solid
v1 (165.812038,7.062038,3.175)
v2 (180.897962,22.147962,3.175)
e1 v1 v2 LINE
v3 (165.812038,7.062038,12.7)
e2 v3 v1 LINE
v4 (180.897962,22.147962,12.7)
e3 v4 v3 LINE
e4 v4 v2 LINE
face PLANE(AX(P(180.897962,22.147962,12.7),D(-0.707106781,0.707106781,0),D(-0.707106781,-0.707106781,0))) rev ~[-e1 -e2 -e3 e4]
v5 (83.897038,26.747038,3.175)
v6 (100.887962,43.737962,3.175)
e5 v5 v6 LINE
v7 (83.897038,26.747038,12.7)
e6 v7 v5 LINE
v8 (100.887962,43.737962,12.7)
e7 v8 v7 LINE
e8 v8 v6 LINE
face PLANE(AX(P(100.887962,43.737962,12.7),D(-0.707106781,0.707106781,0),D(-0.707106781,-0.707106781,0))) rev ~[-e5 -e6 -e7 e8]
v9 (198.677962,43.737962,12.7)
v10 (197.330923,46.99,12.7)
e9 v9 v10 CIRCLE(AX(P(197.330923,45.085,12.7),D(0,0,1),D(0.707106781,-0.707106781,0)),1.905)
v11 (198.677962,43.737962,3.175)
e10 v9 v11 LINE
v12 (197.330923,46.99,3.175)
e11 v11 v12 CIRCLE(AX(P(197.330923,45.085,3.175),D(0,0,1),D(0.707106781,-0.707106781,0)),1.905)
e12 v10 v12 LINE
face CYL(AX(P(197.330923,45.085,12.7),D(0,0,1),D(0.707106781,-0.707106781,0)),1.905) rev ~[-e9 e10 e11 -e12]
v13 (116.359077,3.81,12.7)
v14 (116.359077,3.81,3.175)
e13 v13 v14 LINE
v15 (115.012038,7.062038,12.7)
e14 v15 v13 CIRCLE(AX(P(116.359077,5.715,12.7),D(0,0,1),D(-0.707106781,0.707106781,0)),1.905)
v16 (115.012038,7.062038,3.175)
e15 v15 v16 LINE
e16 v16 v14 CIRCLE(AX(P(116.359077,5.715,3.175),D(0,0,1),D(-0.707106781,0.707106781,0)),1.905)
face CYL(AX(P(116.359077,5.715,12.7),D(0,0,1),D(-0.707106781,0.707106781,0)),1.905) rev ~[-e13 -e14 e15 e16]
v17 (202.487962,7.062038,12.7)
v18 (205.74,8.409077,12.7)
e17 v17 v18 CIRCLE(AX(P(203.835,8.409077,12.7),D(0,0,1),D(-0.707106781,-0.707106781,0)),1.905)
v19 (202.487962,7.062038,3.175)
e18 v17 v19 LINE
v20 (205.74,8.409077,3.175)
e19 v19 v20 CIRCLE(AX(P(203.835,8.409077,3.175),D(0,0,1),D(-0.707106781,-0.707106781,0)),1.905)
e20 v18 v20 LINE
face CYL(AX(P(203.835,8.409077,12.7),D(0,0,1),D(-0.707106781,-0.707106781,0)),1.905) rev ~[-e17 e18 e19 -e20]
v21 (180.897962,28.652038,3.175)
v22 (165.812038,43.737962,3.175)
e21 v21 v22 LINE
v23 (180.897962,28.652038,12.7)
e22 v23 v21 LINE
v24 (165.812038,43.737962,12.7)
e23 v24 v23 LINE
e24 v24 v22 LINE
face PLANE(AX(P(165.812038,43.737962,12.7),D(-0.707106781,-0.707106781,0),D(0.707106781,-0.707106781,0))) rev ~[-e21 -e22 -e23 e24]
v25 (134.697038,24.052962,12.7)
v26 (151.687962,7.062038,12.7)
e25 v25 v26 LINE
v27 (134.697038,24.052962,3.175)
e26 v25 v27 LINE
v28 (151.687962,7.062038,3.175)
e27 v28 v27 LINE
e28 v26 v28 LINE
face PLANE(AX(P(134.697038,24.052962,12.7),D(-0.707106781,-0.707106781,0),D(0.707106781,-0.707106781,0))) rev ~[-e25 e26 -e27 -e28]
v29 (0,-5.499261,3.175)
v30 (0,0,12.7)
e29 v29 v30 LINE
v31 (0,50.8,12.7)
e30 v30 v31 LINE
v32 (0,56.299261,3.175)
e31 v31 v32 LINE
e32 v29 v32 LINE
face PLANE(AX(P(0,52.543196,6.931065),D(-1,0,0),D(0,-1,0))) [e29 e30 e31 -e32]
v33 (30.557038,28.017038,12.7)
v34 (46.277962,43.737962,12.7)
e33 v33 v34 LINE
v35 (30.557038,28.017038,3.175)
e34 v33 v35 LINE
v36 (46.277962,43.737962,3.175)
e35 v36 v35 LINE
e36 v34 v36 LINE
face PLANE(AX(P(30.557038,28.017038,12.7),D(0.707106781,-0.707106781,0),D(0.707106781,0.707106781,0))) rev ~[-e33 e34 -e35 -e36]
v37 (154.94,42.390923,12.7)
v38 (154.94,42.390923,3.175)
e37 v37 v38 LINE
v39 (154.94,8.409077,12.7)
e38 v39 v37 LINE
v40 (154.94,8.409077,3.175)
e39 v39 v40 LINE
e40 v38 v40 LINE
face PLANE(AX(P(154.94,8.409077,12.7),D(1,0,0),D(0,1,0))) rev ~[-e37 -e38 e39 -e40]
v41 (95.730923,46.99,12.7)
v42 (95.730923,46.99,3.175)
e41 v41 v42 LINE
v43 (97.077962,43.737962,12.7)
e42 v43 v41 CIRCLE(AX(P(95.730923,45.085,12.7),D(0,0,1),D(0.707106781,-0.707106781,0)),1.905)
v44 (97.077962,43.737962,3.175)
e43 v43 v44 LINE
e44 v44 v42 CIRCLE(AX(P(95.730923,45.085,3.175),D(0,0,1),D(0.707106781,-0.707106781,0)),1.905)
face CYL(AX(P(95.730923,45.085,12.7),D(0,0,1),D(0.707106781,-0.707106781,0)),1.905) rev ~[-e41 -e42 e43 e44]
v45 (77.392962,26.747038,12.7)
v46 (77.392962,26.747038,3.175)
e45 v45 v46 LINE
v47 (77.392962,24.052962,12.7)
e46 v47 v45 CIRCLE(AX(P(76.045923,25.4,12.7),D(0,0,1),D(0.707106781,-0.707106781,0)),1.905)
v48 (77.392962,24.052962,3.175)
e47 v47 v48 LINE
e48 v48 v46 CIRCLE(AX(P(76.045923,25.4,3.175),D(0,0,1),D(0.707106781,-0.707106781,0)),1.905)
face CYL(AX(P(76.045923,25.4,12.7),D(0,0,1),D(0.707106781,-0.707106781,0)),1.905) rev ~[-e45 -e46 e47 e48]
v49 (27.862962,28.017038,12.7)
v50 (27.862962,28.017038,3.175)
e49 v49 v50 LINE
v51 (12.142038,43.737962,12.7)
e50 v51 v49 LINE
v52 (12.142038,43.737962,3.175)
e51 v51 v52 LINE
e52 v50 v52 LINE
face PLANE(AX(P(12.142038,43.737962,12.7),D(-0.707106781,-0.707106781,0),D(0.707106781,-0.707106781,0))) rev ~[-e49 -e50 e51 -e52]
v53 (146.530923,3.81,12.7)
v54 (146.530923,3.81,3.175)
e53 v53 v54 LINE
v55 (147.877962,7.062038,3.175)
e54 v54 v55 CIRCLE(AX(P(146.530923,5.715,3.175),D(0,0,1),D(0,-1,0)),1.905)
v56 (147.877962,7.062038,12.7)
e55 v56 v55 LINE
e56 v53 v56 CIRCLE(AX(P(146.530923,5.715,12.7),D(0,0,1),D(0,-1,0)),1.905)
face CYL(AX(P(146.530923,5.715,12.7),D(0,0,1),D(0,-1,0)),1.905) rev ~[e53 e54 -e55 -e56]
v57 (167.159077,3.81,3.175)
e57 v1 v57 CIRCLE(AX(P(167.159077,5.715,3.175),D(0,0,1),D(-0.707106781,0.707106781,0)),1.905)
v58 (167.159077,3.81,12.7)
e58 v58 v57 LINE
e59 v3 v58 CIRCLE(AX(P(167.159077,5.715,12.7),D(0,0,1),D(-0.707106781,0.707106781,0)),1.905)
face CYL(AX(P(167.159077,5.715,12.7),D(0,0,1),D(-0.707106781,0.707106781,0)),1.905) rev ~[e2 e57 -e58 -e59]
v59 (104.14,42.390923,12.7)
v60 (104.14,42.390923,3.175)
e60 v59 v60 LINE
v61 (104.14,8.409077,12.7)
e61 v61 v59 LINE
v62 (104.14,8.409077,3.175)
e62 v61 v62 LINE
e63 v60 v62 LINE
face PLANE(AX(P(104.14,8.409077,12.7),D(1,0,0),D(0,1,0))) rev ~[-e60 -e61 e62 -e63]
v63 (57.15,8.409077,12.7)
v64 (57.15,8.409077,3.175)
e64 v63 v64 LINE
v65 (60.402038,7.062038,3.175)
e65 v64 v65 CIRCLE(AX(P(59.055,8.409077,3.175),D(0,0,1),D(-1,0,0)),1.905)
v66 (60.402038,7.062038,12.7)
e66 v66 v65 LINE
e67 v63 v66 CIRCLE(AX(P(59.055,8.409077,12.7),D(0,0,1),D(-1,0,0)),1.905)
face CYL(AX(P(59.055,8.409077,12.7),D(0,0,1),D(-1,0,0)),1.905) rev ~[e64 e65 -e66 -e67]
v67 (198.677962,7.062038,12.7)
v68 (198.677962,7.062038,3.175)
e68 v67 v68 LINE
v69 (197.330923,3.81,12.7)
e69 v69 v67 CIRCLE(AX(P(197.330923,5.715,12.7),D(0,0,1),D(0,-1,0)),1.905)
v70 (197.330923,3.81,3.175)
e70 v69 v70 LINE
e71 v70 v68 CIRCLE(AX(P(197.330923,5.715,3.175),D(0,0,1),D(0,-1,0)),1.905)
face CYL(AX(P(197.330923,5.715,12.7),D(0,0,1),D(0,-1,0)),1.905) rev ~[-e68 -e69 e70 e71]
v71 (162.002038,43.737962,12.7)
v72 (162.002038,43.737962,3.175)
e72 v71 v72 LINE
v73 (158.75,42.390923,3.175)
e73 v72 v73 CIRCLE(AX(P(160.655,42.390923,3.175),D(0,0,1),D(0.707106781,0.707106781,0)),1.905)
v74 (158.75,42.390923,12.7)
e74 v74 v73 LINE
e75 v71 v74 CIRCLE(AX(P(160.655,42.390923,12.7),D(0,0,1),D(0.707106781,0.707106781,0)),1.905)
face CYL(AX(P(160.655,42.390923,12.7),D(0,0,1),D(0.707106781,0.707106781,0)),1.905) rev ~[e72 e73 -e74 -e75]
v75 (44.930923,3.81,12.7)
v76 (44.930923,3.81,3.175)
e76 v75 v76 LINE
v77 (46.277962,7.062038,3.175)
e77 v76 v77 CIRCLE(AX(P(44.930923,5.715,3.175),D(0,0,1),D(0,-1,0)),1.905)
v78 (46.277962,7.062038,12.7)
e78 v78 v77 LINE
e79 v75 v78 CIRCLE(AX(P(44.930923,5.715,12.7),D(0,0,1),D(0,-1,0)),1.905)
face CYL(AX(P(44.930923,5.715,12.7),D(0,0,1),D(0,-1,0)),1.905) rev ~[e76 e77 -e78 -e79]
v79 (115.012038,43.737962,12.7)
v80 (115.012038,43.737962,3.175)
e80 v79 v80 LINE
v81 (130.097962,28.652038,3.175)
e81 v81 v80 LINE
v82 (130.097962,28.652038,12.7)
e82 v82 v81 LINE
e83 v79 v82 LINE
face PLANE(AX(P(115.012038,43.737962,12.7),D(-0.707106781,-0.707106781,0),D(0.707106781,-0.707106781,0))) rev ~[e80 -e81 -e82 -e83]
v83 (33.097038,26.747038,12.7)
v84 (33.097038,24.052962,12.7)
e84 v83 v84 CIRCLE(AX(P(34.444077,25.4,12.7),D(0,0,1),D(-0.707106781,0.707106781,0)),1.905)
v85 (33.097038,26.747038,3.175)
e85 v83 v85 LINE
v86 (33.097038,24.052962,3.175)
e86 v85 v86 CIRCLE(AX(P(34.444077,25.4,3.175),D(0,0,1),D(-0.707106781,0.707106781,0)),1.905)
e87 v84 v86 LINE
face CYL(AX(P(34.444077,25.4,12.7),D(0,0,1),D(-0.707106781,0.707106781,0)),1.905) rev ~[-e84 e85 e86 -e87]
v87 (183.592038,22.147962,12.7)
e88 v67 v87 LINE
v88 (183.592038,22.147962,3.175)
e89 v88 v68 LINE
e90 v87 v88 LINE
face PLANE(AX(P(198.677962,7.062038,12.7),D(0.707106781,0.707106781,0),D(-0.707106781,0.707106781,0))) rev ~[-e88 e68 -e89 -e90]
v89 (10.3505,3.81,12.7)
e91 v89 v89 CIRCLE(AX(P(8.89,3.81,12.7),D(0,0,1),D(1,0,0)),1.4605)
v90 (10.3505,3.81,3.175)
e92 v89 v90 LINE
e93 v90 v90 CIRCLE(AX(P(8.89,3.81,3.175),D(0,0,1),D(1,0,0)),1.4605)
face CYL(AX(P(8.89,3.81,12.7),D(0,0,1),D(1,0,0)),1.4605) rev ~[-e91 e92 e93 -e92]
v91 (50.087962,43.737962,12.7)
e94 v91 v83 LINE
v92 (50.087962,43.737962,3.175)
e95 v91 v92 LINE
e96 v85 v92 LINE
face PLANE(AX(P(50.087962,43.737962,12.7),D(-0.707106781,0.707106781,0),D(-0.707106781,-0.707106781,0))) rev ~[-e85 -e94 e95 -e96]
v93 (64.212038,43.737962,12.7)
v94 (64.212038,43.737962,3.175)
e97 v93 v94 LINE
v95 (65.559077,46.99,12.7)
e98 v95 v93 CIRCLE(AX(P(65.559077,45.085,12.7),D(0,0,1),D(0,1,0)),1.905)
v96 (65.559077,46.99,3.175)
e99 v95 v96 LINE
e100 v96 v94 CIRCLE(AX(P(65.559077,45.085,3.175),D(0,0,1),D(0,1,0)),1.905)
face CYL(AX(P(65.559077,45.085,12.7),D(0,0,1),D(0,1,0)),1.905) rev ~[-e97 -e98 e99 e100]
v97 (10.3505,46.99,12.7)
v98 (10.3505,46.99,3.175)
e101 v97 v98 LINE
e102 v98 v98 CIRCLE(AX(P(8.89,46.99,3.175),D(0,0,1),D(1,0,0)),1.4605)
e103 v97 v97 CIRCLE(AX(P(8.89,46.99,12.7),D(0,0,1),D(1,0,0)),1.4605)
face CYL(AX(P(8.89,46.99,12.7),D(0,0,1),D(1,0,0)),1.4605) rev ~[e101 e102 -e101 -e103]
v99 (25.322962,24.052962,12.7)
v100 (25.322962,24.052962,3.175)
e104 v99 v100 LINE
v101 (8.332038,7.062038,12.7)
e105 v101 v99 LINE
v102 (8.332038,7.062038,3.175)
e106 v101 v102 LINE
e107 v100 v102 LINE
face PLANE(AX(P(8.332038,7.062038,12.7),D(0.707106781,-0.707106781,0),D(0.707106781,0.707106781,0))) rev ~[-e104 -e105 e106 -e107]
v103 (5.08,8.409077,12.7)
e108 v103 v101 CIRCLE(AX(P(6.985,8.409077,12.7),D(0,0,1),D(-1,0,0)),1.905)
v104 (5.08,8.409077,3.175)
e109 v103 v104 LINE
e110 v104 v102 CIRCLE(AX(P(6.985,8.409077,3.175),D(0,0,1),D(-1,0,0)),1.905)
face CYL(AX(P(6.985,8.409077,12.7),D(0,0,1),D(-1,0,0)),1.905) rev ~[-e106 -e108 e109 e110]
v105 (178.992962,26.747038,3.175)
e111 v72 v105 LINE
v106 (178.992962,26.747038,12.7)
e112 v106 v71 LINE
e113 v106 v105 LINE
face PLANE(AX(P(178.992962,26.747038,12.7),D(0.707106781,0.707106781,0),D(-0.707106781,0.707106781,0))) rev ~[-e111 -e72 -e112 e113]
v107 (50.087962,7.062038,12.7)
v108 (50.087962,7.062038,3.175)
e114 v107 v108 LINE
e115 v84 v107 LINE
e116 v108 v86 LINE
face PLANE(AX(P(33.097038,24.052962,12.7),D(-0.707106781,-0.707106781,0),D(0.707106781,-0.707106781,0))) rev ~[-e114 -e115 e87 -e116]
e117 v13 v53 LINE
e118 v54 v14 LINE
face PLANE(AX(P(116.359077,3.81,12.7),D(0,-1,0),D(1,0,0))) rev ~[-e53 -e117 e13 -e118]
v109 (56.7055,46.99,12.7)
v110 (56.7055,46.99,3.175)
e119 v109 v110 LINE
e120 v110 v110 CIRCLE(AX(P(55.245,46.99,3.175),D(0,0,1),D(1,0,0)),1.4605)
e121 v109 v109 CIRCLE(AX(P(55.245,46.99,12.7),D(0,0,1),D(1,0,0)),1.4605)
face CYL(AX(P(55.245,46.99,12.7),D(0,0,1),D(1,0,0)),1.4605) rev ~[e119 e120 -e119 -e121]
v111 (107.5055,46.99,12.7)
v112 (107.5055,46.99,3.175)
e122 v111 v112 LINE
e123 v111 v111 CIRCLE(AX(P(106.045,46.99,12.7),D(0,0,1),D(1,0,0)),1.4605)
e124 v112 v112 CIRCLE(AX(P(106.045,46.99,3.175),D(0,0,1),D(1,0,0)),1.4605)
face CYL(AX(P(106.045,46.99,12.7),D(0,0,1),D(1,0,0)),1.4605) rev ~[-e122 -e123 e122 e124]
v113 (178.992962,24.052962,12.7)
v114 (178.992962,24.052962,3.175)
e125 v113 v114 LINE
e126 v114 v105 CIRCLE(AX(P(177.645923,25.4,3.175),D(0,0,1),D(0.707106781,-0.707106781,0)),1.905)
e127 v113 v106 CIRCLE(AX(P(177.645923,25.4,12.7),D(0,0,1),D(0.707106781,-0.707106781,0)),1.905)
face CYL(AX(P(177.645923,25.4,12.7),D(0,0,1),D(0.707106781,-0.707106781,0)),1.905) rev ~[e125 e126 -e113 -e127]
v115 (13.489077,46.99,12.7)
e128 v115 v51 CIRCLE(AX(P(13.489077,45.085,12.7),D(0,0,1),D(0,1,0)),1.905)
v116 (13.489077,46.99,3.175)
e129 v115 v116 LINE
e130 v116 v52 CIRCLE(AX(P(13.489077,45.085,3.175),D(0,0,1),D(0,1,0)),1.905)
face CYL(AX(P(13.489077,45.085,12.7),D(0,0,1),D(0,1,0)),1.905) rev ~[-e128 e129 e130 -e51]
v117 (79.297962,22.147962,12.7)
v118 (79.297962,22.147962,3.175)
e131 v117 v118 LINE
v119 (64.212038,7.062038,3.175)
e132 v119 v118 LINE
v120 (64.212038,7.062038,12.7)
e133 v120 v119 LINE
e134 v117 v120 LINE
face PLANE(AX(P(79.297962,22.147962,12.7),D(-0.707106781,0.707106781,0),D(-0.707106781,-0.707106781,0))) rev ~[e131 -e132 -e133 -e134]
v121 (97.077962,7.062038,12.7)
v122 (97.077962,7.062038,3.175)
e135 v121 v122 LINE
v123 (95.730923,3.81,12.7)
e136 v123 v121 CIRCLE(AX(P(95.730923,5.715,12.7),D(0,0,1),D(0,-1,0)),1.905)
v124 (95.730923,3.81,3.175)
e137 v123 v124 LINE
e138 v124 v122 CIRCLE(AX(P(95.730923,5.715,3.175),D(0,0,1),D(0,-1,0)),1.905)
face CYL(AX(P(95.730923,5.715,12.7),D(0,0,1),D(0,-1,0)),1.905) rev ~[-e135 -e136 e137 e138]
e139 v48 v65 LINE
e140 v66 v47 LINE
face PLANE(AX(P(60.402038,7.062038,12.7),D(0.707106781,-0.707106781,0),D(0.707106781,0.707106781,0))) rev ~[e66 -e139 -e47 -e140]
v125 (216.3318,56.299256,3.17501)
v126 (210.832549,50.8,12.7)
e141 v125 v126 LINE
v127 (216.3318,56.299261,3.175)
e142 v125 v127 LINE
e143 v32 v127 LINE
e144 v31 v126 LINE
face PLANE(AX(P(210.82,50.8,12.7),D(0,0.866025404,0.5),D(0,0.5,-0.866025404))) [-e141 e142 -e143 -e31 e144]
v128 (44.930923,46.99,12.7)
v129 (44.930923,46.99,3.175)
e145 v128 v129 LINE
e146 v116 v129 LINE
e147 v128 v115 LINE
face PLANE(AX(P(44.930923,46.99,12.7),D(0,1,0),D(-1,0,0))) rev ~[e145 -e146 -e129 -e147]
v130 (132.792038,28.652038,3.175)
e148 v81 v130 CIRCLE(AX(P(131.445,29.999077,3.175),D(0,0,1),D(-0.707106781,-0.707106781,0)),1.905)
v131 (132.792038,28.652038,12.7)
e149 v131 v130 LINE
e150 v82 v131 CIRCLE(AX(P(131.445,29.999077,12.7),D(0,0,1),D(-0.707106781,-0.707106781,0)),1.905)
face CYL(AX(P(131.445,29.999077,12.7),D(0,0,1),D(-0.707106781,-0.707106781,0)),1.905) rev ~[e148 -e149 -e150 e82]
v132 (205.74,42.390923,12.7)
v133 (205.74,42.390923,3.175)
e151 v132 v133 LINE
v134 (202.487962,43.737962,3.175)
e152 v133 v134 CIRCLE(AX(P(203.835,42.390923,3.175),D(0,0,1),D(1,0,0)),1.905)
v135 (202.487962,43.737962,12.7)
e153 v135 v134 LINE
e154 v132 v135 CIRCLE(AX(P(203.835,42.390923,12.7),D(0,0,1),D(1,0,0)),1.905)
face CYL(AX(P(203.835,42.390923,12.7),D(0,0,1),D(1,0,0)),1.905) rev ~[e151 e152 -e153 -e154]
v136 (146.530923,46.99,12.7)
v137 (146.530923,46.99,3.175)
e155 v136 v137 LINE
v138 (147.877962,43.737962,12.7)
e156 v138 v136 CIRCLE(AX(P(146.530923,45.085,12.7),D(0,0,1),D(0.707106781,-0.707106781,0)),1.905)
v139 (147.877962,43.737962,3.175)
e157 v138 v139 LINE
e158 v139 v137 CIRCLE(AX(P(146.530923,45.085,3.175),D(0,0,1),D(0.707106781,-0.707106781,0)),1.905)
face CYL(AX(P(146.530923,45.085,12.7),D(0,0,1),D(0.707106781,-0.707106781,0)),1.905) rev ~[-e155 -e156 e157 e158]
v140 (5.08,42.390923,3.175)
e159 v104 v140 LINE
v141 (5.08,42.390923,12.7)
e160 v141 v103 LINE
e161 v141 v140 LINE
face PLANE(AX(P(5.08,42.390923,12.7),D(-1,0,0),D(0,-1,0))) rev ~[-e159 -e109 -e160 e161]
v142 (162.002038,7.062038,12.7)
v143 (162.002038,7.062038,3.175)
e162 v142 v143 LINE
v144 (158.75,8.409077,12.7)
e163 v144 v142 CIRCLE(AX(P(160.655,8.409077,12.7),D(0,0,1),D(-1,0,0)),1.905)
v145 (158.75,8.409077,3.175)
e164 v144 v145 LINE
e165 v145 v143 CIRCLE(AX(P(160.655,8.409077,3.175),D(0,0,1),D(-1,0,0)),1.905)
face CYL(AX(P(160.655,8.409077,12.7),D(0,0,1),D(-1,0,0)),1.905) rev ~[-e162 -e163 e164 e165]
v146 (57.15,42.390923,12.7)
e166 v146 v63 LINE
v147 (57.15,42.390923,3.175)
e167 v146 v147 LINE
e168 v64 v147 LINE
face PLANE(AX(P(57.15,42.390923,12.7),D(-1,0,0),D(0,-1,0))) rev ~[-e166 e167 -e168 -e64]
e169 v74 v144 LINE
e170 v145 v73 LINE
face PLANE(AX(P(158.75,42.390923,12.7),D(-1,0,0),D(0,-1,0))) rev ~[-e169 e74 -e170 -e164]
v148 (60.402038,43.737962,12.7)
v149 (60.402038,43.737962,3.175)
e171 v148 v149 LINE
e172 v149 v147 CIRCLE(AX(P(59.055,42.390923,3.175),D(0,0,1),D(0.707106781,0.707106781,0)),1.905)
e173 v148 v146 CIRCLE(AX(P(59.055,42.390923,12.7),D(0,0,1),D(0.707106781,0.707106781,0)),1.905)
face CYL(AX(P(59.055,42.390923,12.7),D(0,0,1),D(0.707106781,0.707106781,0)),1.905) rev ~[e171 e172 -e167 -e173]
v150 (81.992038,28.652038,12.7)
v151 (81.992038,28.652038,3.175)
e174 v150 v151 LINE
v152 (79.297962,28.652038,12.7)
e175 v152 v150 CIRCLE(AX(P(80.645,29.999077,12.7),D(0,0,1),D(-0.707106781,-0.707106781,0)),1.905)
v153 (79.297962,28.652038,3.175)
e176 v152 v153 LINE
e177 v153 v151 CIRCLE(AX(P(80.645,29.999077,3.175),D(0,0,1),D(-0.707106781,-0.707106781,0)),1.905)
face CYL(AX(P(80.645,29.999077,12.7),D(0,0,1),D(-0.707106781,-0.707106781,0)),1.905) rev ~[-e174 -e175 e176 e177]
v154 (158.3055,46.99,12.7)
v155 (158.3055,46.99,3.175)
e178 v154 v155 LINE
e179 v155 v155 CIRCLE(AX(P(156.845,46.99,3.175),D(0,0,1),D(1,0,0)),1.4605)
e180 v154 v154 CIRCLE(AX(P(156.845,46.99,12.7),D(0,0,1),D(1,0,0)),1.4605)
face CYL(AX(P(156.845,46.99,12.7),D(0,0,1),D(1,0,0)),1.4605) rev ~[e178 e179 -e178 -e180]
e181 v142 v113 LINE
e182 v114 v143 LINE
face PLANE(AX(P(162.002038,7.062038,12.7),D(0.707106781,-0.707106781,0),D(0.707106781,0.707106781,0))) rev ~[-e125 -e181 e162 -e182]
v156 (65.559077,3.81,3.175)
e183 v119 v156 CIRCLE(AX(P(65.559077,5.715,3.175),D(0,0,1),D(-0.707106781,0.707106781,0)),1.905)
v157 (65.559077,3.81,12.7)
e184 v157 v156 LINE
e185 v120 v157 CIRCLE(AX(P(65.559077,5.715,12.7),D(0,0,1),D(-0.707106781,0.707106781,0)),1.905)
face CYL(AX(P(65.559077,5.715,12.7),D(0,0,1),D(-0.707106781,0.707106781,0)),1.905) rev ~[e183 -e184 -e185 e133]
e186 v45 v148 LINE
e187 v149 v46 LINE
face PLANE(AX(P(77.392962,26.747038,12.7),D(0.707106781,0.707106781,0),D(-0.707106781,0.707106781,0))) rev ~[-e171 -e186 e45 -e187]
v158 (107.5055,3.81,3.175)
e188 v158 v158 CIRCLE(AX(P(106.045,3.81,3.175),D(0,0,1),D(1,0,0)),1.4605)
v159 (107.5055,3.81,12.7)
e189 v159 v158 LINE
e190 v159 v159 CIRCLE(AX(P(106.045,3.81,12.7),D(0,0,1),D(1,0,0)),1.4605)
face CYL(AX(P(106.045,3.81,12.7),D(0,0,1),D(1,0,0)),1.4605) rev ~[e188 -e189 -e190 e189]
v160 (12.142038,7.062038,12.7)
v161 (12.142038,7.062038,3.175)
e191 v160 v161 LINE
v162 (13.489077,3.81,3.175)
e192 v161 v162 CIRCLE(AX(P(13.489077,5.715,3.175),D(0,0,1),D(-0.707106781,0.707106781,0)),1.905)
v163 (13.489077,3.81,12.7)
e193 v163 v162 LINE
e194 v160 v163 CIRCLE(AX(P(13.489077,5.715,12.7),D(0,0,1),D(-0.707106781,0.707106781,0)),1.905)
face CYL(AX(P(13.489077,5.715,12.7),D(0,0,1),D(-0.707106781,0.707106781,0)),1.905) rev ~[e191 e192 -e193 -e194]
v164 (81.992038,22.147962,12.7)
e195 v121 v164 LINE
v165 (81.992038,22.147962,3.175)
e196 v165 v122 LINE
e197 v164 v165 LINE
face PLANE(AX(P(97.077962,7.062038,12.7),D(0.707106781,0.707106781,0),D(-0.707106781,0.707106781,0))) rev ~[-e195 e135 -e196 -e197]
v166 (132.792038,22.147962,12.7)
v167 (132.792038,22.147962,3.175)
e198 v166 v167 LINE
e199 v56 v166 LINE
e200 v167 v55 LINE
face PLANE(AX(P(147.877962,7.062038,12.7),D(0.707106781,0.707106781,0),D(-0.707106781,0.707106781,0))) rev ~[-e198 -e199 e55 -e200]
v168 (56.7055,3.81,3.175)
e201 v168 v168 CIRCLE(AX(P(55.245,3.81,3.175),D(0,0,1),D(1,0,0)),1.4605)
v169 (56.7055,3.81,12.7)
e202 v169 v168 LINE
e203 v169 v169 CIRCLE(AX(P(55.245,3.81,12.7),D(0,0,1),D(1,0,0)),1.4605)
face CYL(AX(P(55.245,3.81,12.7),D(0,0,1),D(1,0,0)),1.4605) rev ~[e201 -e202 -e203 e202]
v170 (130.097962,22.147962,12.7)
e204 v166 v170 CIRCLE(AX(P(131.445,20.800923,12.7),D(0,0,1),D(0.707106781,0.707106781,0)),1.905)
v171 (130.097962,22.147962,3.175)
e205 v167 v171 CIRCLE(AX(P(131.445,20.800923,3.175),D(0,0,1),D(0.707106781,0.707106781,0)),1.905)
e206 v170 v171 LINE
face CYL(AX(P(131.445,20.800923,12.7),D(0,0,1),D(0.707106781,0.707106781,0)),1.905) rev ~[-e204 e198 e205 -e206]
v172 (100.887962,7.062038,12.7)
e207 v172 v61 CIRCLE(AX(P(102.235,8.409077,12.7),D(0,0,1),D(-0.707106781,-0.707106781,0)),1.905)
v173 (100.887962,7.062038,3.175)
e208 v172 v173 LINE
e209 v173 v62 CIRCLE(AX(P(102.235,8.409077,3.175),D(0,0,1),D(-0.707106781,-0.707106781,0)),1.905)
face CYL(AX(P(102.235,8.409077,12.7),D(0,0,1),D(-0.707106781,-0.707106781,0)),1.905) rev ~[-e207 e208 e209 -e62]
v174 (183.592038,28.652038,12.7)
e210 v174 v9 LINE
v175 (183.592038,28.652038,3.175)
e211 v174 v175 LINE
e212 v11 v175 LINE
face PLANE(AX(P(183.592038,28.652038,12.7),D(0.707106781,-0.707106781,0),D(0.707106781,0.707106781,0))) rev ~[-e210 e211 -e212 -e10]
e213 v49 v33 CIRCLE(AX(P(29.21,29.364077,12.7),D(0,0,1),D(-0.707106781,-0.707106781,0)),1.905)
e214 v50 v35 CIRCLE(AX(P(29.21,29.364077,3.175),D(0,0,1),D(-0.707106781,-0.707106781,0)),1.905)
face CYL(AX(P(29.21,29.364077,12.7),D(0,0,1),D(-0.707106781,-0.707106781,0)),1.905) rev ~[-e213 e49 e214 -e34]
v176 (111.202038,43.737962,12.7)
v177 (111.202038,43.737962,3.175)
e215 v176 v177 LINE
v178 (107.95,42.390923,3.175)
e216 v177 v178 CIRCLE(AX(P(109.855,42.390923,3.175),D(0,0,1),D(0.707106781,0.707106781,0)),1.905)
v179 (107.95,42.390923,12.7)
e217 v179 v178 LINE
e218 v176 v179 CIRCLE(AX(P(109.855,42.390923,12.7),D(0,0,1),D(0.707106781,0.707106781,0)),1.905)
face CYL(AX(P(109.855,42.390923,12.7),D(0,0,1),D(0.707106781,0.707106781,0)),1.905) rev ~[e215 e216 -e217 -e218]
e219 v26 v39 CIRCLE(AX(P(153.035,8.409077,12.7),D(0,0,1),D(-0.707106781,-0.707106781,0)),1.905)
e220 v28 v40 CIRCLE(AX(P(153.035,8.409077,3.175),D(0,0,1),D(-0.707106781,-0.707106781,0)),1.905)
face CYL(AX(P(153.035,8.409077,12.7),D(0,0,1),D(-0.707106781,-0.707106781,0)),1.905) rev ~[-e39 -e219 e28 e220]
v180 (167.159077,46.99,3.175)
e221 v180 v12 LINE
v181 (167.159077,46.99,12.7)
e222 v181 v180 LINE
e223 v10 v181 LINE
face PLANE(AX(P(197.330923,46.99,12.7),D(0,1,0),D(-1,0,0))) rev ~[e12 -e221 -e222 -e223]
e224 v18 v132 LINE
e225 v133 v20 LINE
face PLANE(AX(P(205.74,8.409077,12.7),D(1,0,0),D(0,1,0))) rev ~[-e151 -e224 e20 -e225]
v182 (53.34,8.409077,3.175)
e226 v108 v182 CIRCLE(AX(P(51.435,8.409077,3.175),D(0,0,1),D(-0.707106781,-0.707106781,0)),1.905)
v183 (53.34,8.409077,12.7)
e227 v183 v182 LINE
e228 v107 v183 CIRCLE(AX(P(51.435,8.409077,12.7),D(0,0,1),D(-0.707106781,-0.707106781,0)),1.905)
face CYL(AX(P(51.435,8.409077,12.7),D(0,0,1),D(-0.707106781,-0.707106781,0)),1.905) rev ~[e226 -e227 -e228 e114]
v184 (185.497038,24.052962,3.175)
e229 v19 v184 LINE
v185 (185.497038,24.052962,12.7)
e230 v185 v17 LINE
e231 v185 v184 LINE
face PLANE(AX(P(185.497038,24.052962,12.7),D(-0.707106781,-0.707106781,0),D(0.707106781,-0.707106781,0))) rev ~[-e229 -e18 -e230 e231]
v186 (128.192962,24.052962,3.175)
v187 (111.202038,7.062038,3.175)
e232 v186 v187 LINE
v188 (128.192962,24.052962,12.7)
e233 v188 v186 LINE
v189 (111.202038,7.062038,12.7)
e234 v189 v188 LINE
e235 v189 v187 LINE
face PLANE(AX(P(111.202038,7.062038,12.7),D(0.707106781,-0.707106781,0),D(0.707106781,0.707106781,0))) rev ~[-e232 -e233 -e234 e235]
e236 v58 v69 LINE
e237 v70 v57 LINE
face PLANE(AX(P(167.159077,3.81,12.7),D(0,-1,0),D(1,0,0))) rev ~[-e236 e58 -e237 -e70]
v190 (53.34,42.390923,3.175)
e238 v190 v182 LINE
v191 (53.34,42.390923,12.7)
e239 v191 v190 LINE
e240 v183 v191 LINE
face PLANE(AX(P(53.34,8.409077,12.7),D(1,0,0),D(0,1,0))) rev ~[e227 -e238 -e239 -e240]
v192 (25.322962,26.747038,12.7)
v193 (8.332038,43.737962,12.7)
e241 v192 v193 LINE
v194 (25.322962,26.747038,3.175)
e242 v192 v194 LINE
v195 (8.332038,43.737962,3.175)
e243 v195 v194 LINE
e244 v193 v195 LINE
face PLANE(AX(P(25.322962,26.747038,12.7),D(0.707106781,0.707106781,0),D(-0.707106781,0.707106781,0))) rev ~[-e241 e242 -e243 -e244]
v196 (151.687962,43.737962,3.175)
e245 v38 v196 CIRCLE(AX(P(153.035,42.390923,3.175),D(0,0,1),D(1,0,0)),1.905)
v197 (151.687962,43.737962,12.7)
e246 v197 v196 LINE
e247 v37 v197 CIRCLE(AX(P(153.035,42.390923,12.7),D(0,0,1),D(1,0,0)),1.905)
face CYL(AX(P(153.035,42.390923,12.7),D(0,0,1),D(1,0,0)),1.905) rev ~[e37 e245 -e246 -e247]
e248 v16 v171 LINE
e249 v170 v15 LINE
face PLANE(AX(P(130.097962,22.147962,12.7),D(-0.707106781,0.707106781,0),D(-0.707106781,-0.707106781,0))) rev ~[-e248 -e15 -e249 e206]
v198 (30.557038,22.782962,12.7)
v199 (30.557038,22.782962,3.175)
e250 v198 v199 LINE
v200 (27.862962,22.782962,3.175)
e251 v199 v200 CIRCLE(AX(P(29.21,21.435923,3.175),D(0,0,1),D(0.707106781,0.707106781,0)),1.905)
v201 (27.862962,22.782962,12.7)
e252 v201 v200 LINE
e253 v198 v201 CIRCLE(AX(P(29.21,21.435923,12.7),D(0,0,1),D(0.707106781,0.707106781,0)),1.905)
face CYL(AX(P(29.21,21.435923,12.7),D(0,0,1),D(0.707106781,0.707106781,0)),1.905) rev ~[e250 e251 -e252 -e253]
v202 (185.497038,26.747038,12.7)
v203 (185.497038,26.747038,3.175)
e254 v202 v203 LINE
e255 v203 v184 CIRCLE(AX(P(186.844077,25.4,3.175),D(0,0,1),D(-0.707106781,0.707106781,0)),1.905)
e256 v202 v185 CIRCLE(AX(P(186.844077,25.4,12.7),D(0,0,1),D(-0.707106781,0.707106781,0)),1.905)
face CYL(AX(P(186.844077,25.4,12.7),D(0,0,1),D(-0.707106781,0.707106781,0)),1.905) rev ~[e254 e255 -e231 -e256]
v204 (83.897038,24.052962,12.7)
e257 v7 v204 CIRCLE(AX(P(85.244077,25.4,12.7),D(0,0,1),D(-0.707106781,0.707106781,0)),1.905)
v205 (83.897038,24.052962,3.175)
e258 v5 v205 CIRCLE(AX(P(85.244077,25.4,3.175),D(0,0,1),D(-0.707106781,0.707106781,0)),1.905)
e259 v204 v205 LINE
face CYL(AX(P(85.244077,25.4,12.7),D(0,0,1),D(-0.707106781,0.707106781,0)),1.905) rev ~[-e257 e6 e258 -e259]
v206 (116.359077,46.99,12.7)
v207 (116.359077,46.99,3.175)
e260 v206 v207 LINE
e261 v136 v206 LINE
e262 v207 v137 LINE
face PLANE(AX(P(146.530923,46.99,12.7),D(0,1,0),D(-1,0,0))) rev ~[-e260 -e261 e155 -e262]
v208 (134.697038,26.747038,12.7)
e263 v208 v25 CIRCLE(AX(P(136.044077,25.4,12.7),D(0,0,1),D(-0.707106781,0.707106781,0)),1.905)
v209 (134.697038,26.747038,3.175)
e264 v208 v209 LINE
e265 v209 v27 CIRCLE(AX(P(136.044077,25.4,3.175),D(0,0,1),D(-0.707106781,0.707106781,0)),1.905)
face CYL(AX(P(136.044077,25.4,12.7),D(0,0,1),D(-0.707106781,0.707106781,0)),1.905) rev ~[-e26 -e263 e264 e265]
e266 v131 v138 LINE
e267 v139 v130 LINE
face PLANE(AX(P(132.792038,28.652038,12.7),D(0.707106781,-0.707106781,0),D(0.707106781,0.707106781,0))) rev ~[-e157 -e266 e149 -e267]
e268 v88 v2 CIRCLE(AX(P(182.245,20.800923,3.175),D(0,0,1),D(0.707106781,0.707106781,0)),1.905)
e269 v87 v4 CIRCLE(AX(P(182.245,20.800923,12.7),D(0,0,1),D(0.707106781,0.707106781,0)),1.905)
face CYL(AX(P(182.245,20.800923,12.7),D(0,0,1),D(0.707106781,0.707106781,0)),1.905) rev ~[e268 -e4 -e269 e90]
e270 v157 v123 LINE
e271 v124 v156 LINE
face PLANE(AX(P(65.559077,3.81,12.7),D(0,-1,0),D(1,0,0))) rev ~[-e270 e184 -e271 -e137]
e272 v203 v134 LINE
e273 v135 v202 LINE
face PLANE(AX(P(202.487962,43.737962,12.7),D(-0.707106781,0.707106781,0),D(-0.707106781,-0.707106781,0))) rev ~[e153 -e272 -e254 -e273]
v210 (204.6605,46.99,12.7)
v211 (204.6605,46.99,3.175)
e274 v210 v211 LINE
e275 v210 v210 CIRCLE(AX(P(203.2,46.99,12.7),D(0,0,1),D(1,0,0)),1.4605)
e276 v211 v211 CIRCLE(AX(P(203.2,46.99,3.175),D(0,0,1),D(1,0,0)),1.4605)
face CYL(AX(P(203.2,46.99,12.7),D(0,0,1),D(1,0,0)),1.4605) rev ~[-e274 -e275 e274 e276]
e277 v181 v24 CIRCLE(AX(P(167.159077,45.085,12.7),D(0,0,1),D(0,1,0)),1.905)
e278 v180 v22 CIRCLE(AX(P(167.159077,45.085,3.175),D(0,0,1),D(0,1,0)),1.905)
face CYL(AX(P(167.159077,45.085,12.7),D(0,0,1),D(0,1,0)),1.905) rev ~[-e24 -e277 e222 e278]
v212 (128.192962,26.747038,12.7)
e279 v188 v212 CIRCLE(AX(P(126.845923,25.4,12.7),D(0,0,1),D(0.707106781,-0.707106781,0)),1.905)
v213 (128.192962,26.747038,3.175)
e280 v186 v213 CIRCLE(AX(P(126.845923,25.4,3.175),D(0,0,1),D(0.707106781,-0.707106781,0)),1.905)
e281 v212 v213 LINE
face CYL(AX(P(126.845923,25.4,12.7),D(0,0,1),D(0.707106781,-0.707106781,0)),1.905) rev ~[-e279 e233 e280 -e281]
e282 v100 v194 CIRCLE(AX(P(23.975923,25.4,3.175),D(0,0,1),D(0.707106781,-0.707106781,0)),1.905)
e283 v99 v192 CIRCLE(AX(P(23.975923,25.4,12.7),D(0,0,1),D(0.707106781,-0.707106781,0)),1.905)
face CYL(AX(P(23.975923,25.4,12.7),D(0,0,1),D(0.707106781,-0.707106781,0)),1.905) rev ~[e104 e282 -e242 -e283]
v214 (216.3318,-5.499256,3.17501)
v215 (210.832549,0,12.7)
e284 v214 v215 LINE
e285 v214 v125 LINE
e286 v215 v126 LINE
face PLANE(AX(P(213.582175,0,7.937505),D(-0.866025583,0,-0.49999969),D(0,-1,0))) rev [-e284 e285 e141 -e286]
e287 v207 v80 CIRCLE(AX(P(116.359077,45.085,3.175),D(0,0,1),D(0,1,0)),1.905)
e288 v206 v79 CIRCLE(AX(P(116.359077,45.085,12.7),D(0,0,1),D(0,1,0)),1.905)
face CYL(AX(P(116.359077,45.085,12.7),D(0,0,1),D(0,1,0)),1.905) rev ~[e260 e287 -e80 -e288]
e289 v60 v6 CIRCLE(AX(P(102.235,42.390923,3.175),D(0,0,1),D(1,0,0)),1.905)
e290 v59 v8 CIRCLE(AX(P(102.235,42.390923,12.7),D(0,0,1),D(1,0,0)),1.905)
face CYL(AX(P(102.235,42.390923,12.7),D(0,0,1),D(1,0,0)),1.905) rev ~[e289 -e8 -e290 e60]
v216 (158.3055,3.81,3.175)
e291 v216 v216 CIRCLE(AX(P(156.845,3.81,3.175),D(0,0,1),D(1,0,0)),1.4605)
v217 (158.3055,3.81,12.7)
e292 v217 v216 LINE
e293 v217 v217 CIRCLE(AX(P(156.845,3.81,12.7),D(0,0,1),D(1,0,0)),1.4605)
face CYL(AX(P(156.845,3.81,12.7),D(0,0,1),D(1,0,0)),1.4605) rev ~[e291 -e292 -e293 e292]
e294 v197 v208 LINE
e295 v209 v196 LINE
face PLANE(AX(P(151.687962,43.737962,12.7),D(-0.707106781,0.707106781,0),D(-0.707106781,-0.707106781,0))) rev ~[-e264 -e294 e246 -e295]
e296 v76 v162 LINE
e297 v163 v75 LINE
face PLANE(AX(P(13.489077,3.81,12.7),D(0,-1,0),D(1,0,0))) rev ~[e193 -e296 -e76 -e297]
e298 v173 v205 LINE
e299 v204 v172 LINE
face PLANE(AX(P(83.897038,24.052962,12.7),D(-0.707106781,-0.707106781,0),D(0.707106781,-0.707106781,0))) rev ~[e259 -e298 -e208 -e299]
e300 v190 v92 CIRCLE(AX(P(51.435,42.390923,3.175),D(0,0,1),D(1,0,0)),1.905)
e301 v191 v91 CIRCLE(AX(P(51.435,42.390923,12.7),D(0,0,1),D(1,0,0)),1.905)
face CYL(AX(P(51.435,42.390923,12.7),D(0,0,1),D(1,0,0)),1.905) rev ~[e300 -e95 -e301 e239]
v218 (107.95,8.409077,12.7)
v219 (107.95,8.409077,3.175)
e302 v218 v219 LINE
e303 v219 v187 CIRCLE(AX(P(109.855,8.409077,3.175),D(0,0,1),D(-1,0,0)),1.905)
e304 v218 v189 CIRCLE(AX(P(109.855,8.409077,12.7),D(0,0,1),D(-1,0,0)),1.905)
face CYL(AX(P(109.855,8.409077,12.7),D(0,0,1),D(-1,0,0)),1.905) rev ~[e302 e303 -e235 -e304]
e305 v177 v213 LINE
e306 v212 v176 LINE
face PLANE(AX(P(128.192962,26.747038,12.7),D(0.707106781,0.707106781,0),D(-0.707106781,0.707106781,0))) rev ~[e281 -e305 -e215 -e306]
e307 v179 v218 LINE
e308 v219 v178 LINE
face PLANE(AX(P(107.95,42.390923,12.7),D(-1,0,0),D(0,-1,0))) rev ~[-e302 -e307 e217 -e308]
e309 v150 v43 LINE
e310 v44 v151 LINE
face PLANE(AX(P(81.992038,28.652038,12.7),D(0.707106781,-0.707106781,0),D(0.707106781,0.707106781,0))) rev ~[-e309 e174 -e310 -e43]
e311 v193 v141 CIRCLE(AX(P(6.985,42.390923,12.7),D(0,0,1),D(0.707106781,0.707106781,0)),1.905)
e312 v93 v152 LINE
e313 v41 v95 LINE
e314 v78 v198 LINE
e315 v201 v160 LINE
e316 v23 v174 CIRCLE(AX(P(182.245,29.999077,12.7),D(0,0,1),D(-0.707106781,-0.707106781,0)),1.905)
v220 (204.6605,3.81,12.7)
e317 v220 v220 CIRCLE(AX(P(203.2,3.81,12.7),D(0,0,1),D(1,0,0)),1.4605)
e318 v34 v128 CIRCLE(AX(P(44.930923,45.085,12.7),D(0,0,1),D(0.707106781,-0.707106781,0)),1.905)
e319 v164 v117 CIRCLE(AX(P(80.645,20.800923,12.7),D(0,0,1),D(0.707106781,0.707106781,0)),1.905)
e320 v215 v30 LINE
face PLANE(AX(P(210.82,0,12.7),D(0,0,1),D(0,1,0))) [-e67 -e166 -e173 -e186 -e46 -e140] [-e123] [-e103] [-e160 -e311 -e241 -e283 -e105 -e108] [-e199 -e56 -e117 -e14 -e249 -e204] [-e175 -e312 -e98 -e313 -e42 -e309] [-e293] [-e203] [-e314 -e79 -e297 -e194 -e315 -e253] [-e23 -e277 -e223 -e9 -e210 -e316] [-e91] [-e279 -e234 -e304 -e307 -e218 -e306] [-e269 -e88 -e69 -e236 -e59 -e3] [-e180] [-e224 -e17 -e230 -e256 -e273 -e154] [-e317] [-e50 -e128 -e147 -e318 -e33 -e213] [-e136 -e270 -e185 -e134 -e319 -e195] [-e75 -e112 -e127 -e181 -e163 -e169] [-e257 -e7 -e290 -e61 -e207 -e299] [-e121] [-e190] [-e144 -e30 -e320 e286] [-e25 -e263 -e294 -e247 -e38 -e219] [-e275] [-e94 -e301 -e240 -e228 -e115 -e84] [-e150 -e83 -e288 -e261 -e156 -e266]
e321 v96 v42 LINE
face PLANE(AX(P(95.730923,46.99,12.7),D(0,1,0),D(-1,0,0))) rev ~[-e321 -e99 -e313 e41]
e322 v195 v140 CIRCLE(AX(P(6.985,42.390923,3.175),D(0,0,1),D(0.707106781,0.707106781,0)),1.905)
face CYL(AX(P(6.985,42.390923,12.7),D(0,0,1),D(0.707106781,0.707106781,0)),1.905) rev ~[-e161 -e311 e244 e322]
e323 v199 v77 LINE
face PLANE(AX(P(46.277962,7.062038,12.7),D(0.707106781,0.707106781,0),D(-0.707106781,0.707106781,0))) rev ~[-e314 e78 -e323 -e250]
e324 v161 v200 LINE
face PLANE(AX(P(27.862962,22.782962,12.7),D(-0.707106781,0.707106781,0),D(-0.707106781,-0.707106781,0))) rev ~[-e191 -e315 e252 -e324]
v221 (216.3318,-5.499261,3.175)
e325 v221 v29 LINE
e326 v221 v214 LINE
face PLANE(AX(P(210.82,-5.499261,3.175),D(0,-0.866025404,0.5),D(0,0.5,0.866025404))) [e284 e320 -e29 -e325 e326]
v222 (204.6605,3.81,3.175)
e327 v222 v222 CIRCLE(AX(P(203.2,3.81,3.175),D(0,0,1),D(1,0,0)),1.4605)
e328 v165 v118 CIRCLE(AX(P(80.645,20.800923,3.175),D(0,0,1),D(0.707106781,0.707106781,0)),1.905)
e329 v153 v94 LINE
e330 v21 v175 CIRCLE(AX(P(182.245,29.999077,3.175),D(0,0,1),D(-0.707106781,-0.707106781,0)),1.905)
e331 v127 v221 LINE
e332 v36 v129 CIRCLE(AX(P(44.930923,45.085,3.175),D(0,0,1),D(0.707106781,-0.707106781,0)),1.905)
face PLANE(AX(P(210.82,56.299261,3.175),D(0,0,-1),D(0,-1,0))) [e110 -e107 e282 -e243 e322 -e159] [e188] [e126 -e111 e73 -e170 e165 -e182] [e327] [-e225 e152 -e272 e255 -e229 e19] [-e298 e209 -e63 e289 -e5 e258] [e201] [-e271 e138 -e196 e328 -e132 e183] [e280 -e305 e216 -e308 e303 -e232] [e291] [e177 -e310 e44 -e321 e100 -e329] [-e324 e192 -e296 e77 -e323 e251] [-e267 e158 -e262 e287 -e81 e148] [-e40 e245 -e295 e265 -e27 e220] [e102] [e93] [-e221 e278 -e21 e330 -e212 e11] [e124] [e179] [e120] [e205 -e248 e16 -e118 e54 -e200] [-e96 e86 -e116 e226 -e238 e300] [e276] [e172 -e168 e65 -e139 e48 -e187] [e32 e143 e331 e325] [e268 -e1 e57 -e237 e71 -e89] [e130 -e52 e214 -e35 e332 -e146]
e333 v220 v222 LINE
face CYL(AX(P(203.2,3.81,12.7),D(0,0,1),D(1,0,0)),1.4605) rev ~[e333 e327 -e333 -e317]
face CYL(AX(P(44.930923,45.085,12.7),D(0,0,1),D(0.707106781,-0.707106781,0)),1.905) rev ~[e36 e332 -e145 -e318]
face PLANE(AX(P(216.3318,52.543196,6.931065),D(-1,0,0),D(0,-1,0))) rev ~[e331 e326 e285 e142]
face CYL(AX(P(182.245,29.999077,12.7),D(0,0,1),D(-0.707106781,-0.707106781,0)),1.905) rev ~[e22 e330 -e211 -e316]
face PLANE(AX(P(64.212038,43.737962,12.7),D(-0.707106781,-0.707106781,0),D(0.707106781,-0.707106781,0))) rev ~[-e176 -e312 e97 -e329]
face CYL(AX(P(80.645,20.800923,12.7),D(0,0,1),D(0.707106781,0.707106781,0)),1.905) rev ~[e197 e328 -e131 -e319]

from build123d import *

# Parameters (mm, degrees)
F0_W      = 210.82
F0_H      = 50.8
F1_DEPTH  = 12.7
F3_DEPTH  = 10.16
F4_DEPTH  = 3.175
F6_DEPTH  = 210.82
F7_DEPTH  = 5.5118
F8_SIZE2  = 5.499251
F8_SIZE   = 9.52499
F9_R      = 1.4605
F10_DEPTH = 9.525


# Not quite as in the source:
# - a fillet or chamfer is up to 0.001 mm smaller than in the source, because OpenCascade refuses the exact size


with BuildPart() as f1:
    # F0 (on Top) → F1 (new body)
    with BuildSketch(Plane.XY):
        with Locations((105.41, 25.4)):
            Rectangle(F0_W, F0_H)
    extrude(amount=F1_DEPTH)

    # F2 (on face) → F3 (cut)
    with BuildSketch(Plane.XY.offset(12.7)):
        with BuildLine():
            ThreePointArc((8.3320384182, 43.7379615818), (6.2559880613, 44.1509136731), (5.08, 42.3909231637))
            Line((5.08, 42.3909231637), (5.08, 8.4090768363))
            ThreePointArc((5.08, 8.4090768363), (6.2559880613, 6.6490863269), (8.3320384182, 7.0620384182))
            Line((8.3320384182, 7.0620384182), (25.3229615818, 24.0529615818))
            ThreePointArc((25.3229615818, 24.0529615818), (25.8809231637, 25.4), (25.3229615818, 26.7470384182))
            Line((25.3229615818, 26.7470384182), (8.3320384182, 43.7379615818))
        make_face()
        with BuildLine():
            Line((50.0879615818, 43.7379615818), (33.0970384182, 26.7470384182))
            ThreePointArc((33.0970384182, 26.7470384182), (32.5390768363, 25.4), (33.0970384182, 24.0529615818))
            Line((33.0970384182, 24.0529615818), (50.0879615818, 7.0620384182))
            ThreePointArc((50.0879615818, 7.0620384182), (52.1640119387, 6.6490863269), (53.34, 8.4090768363))
            Line((53.34, 8.4090768363), (53.34, 42.3909231637))
            ThreePointArc((53.34, 42.3909231637), (52.1640119387, 44.1509136731), (50.0879615818, 43.7379615818))
        make_face()
        with BuildLine():
            ThreePointArc((60.4020384182, 43.7379615818), (58.3259880613, 44.1509136731), (57.15, 42.3909231637))
            Line((57.15, 42.3909231637), (57.15, 8.4090768363))
            ThreePointArc((57.15, 8.4090768363), (58.3259880613, 6.6490863269), (60.4020384182, 7.0620384182))
            Line((60.4020384182, 7.0620384182), (77.3929615818, 24.0529615818))
            ThreePointArc((77.3929615818, 24.0529615818), (77.9509231637, 25.4), (77.3929615818, 26.7470384182))
            Line((77.3929615818, 26.7470384182), (60.4020384182, 43.7379615818))
        make_face()
        with BuildLine():
            Line((104.14, 8.4090768363), (104.14, 42.3909231637))
            ThreePointArc((104.14, 42.3909231637), (102.9640119387, 44.1509136731), (100.8879615818, 43.7379615818))
            Line((100.8879615818, 43.7379615818), (83.8970384182, 26.7470384182))
            ThreePointArc((83.8970384182, 26.7470384182), (83.3390768363, 25.4), (83.8970384182, 24.0529615818))
            Line((83.8970384182, 24.0529615818), (100.8879615818, 7.0620384182))
            ThreePointArc((100.8879615818, 7.0620384182), (102.9640119387, 6.6490863269), (104.14, 8.4090768363))
        make_face()
        with BuildLine():
            ThreePointArc((111.2020384182, 43.7379615818), (109.1259880613, 44.1509136731), (107.95, 42.3909231637))
            Line((107.95, 42.3909231637), (107.95, 8.4090768363))
            ThreePointArc((107.95, 8.4090768363), (109.1259880613, 6.6490863269), (111.2020384182, 7.0620384182))
            Line((111.2020384182, 7.0620384182), (128.1929615818, 24.0529615818))
            ThreePointArc((128.1929615818, 24.0529615818), (128.7509231637, 25.4), (128.1929615818, 26.7470384182))
            Line((128.1929615818, 26.7470384182), (111.2020384182, 43.7379615818))
        make_face()
        with BuildLine():
            Line((154.94, 8.4090768363), (154.94, 42.3909231637))
            ThreePointArc((154.94, 42.3909231637), (153.7640119387, 44.1509136731), (151.6879615818, 43.7379615818))
            Line((151.6879615818, 43.7379615818), (134.6970384182, 26.7470384182))
            ThreePointArc((134.6970384182, 26.7470384182), (134.1390768363, 25.4), (134.6970384182, 24.0529615818))
            Line((134.6970384182, 24.0529615818), (151.6879615818, 7.0620384182))
            ThreePointArc((151.6879615818, 7.0620384182), (153.7640119387, 6.6490863269), (154.94, 8.4090768363))
        make_face()
        with BuildLine():
            ThreePointArc((162.0020384182, 43.7379615818), (159.9259880613, 44.1509136731), (158.75, 42.3909231637))
            Line((158.75, 42.3909231637), (158.75, 8.4090768363))
            ThreePointArc((158.75, 8.4090768363), (159.9259880613, 6.6490863269), (162.0020384182, 7.0620384182))
            Line((162.0020384182, 7.0620384182), (178.9929615818, 24.0529615818))
            ThreePointArc((178.9929615818, 24.0529615818), (179.5509231637, 25.4), (178.9929615818, 26.7470384182))
            Line((178.9929615818, 26.7470384182), (162.0020384182, 43.7379615818))
        make_face()
        with BuildLine():
            Line((205.74, 8.4090768363), (205.74, 42.3909231637))
            ThreePointArc((205.74, 42.3909231637), (204.5640119387, 44.1509136731), (202.4879615818, 43.7379615818))
            Line((202.4879615818, 43.7379615818), (185.4970384182, 26.7470384182))
            ThreePointArc((185.4970384182, 26.7470384182), (184.9390768363, 25.4), (185.4970384182, 24.0529615818))
            Line((185.4970384182, 24.0529615818), (202.4879615818, 7.0620384182))
            ThreePointArc((202.4879615818, 7.0620384182), (204.5640119387, 6.6490863269), (205.74, 8.4090768363))
        make_face()
        with BuildLine():
            Line((44.9309231637, 46.99), (13.4890768363, 46.99))
            ThreePointArc((13.4890768363, 46.99), (11.7290863269, 45.8140119387), (12.1420384182, 43.7379615818))
            Line((12.1420384182, 43.7379615818), (27.8629615818, 28.0170384182))
            ThreePointArc((27.8629615818, 28.0170384182), (29.21, 27.4590768363), (30.5570384182, 28.0170384182))
            Line((30.5570384182, 28.0170384182), (46.2779615818, 43.7379615818))
            ThreePointArc((46.2779615818, 43.7379615818), (46.6909136731, 45.8140119387), (44.9309231637, 46.99))
        make_face()
        with BuildLine():
            ThreePointArc((12.1420384182, 7.0620384182), (11.7290863269, 4.9859880613), (13.4890768363, 3.81))
            Line((13.4890768363, 3.81), (44.9309231637, 3.81))
            ThreePointArc((44.9309231637, 3.81), (46.6909136731, 4.9859880613), (46.2779615818, 7.0620384182))
            Line((46.2779615818, 7.0620384182), (30.5570384182, 22.7829615818))
            ThreePointArc((30.5570384182, 22.7829615818), (29.21, 23.3409231637), (27.8629615818, 22.7829615818))
            Line((27.8629615818, 22.7829615818), (12.1420384182, 7.0620384182))
        make_face()
        with BuildLine():
            Line((95.7309231637, 46.99), (65.5590768363, 46.99))
            ThreePointArc((65.5590768363, 46.99), (63.7990863269, 45.8140119387), (64.2120384182, 43.7379615818))
            Line((64.2120384182, 43.7379615818), (79.2979615818, 28.6520384182))
            ThreePointArc((79.2979615818, 28.6520384182), (80.645, 28.0940768363), (81.9920384182, 28.6520384182))
            Line((81.9920384182, 28.6520384182), (97.0779615818, 43.7379615818))
            ThreePointArc((97.0779615818, 43.7379615818), (97.4909136731, 45.8140119387), (95.7309231637, 46.99))
        make_face()
        with BuildLine():
            ThreePointArc((64.2120384182, 7.0620384182), (63.7990863269, 4.9859880613), (65.5590768363, 3.81))
            Line((65.5590768363, 3.81), (95.7309231637, 3.81))
            ThreePointArc((95.7309231637, 3.81), (97.4909136731, 4.9859880613), (97.0779615818, 7.0620384182))
            Line((97.0779615818, 7.0620384182), (81.9920384182, 22.1479615818))
            ThreePointArc((81.9920384182, 22.1479615818), (80.645, 22.7059231637), (79.2979615818, 22.1479615818))
            Line((79.2979615818, 22.1479615818), (64.2120384182, 7.0620384182))
        make_face()
        with BuildLine():
            Line((146.5309231637, 46.99), (116.3590768363, 46.99))
            ThreePointArc((116.3590768363, 46.99), (114.5990863269, 45.8140119387), (115.0120384182, 43.7379615818))
            Line((115.0120384182, 43.7379615818), (130.0979615818, 28.6520384182))
            ThreePointArc((130.0979615818, 28.6520384182), (131.445, 28.0940768363), (132.7920384182, 28.6520384182))
            Line((132.7920384182, 28.6520384182), (147.8779615818, 43.7379615818))
            ThreePointArc((147.8779615818, 43.7379615818), (148.2909136731, 45.8140119387), (146.5309231637, 46.99))
        make_face()
        with BuildLine():
            ThreePointArc((115.0120384182, 7.0620384182), (114.5990863269, 4.9859880613), (116.3590768363, 3.81))
            Line((116.3590768363, 3.81), (146.5309231637, 3.81))
            ThreePointArc((146.5309231637, 3.81), (148.2909136731, 4.9859880613), (147.8779615818, 7.0620384182))
            Line((147.8779615818, 7.0620384182), (132.7920384182, 22.1479615818))
            ThreePointArc((132.7920384182, 22.1479615818), (131.445, 22.7059231637), (130.0979615818, 22.1479615818))
            Line((130.0979615818, 22.1479615818), (115.0120384182, 7.0620384182))
        make_face()
        with BuildLine():
            Line((197.3309231637, 46.99), (167.1590768363, 46.99))
            ThreePointArc((167.1590768363, 46.99), (165.3990863269, 45.8140119387), (165.8120384182, 43.7379615818))
            Line((165.8120384182, 43.7379615818), (180.8979615818, 28.6520384182))
            ThreePointArc((180.8979615818, 28.6520384182), (182.245, 28.0940768363), (183.5920384182, 28.6520384182))
            Line((183.5920384182, 28.6520384182), (198.6779615818, 43.7379615818))
            ThreePointArc((198.6779615818, 43.7379615818), (199.0909136731, 45.8140119387), (197.3309231637, 46.99))
        make_face()
        with BuildLine():
            ThreePointArc((165.8120384182, 7.0620384182), (165.3990863269, 4.9859880613), (167.1590768363, 3.81))
            Line((167.1590768363, 3.81), (197.3309231637, 3.81))
            ThreePointArc((197.3309231637, 3.81), (199.0909136731, 4.9859880613), (198.6779615818, 7.0620384182))
            Line((198.6779615818, 7.0620384182), (183.5920384182, 22.1479615818))
            ThreePointArc((183.5920384182, 22.1479615818), (182.245, 22.7059231637), (180.8979615818, 22.1479615818))
            Line((180.8979615818, 22.1479615818), (165.8120384182, 7.0620384182))
        make_face()
    extrude(amount=-F3_DEPTH, mode=Mode.SUBTRACT)

    # F4 (cut): a face of the model
    f4_faces = [f1.faces().sort_by_distance(p)[0] for p in [
        (105.41, 25.4, 0),
    ]]
    extrude(f4_faces, amount=-F4_DEPTH, mode=Mode.SUBTRACT)

    # F5 (on face) → F6 (join)
    with BuildSketch(Plane(origin=(0, 0, 0), x_dir=(0, -1, 0), z_dir=(-1, 0, 0))):
        Polygon((-56.299261314, 3.175), (-50.8, 3.175), (-50.8, 12.7), align=None)
        Polygon((0, 12.7), (0, 3.175), (5.499261314, 3.175), align=None)
    extrude(amount=-F6_DEPTH)

    # F7 (add): a face of the model
    f7_faces = [f1.faces().sort_by_distance(p)[0] for p in [
        (210.82, 25.4, 7.7824344249),
    ]]
    extrude(f7_faces, amount=F7_DEPTH)

    # F8 (size 9.525 and 5.499261314 in the source; OpenCascade refuses exactly that, so slightly less here)
    f8_edges = [f1.edges().sort_by_distance(p)[0] for p in [
        (216.3318, 25.4, 12.7),
    ]]
    f8_side = f1.faces().sort_by_distance((216.3318, 25.4, 7.782434))[0]
    chamfer(f8_edges, length=F8_SIZE, length2=F8_SIZE2, reference=f8_side)

    # F9 (on face) → F10 (cut)
    with BuildSketch(Plane.XY.offset(12.7)):
        with Locations((8.89, 46.99)):
            Circle(F9_R)
        with Locations((8.89, 3.81)):
            Circle(F9_R)
        with Locations((55.245, 46.99)):
            Circle(F9_R)
        with Locations((55.245, 3.81)):
            Circle(F9_R)
        with Locations((106.045, 46.99)):
            Circle(F9_R)
        with Locations((106.045, 3.81)):
            Circle(F9_R)
        with Locations((156.845, 46.99)):
            Circle(F9_R)
        with Locations((156.845, 3.81)):
            Circle(F9_R)
        with Locations((203.2, 46.99)):
            Circle(F9_R)
        with Locations((203.2, 3.81)):
            Circle(F9_R)
    extrude(amount=-F10_DEPTH, mode=Mode.SUBTRACT)


solid = f1.part
